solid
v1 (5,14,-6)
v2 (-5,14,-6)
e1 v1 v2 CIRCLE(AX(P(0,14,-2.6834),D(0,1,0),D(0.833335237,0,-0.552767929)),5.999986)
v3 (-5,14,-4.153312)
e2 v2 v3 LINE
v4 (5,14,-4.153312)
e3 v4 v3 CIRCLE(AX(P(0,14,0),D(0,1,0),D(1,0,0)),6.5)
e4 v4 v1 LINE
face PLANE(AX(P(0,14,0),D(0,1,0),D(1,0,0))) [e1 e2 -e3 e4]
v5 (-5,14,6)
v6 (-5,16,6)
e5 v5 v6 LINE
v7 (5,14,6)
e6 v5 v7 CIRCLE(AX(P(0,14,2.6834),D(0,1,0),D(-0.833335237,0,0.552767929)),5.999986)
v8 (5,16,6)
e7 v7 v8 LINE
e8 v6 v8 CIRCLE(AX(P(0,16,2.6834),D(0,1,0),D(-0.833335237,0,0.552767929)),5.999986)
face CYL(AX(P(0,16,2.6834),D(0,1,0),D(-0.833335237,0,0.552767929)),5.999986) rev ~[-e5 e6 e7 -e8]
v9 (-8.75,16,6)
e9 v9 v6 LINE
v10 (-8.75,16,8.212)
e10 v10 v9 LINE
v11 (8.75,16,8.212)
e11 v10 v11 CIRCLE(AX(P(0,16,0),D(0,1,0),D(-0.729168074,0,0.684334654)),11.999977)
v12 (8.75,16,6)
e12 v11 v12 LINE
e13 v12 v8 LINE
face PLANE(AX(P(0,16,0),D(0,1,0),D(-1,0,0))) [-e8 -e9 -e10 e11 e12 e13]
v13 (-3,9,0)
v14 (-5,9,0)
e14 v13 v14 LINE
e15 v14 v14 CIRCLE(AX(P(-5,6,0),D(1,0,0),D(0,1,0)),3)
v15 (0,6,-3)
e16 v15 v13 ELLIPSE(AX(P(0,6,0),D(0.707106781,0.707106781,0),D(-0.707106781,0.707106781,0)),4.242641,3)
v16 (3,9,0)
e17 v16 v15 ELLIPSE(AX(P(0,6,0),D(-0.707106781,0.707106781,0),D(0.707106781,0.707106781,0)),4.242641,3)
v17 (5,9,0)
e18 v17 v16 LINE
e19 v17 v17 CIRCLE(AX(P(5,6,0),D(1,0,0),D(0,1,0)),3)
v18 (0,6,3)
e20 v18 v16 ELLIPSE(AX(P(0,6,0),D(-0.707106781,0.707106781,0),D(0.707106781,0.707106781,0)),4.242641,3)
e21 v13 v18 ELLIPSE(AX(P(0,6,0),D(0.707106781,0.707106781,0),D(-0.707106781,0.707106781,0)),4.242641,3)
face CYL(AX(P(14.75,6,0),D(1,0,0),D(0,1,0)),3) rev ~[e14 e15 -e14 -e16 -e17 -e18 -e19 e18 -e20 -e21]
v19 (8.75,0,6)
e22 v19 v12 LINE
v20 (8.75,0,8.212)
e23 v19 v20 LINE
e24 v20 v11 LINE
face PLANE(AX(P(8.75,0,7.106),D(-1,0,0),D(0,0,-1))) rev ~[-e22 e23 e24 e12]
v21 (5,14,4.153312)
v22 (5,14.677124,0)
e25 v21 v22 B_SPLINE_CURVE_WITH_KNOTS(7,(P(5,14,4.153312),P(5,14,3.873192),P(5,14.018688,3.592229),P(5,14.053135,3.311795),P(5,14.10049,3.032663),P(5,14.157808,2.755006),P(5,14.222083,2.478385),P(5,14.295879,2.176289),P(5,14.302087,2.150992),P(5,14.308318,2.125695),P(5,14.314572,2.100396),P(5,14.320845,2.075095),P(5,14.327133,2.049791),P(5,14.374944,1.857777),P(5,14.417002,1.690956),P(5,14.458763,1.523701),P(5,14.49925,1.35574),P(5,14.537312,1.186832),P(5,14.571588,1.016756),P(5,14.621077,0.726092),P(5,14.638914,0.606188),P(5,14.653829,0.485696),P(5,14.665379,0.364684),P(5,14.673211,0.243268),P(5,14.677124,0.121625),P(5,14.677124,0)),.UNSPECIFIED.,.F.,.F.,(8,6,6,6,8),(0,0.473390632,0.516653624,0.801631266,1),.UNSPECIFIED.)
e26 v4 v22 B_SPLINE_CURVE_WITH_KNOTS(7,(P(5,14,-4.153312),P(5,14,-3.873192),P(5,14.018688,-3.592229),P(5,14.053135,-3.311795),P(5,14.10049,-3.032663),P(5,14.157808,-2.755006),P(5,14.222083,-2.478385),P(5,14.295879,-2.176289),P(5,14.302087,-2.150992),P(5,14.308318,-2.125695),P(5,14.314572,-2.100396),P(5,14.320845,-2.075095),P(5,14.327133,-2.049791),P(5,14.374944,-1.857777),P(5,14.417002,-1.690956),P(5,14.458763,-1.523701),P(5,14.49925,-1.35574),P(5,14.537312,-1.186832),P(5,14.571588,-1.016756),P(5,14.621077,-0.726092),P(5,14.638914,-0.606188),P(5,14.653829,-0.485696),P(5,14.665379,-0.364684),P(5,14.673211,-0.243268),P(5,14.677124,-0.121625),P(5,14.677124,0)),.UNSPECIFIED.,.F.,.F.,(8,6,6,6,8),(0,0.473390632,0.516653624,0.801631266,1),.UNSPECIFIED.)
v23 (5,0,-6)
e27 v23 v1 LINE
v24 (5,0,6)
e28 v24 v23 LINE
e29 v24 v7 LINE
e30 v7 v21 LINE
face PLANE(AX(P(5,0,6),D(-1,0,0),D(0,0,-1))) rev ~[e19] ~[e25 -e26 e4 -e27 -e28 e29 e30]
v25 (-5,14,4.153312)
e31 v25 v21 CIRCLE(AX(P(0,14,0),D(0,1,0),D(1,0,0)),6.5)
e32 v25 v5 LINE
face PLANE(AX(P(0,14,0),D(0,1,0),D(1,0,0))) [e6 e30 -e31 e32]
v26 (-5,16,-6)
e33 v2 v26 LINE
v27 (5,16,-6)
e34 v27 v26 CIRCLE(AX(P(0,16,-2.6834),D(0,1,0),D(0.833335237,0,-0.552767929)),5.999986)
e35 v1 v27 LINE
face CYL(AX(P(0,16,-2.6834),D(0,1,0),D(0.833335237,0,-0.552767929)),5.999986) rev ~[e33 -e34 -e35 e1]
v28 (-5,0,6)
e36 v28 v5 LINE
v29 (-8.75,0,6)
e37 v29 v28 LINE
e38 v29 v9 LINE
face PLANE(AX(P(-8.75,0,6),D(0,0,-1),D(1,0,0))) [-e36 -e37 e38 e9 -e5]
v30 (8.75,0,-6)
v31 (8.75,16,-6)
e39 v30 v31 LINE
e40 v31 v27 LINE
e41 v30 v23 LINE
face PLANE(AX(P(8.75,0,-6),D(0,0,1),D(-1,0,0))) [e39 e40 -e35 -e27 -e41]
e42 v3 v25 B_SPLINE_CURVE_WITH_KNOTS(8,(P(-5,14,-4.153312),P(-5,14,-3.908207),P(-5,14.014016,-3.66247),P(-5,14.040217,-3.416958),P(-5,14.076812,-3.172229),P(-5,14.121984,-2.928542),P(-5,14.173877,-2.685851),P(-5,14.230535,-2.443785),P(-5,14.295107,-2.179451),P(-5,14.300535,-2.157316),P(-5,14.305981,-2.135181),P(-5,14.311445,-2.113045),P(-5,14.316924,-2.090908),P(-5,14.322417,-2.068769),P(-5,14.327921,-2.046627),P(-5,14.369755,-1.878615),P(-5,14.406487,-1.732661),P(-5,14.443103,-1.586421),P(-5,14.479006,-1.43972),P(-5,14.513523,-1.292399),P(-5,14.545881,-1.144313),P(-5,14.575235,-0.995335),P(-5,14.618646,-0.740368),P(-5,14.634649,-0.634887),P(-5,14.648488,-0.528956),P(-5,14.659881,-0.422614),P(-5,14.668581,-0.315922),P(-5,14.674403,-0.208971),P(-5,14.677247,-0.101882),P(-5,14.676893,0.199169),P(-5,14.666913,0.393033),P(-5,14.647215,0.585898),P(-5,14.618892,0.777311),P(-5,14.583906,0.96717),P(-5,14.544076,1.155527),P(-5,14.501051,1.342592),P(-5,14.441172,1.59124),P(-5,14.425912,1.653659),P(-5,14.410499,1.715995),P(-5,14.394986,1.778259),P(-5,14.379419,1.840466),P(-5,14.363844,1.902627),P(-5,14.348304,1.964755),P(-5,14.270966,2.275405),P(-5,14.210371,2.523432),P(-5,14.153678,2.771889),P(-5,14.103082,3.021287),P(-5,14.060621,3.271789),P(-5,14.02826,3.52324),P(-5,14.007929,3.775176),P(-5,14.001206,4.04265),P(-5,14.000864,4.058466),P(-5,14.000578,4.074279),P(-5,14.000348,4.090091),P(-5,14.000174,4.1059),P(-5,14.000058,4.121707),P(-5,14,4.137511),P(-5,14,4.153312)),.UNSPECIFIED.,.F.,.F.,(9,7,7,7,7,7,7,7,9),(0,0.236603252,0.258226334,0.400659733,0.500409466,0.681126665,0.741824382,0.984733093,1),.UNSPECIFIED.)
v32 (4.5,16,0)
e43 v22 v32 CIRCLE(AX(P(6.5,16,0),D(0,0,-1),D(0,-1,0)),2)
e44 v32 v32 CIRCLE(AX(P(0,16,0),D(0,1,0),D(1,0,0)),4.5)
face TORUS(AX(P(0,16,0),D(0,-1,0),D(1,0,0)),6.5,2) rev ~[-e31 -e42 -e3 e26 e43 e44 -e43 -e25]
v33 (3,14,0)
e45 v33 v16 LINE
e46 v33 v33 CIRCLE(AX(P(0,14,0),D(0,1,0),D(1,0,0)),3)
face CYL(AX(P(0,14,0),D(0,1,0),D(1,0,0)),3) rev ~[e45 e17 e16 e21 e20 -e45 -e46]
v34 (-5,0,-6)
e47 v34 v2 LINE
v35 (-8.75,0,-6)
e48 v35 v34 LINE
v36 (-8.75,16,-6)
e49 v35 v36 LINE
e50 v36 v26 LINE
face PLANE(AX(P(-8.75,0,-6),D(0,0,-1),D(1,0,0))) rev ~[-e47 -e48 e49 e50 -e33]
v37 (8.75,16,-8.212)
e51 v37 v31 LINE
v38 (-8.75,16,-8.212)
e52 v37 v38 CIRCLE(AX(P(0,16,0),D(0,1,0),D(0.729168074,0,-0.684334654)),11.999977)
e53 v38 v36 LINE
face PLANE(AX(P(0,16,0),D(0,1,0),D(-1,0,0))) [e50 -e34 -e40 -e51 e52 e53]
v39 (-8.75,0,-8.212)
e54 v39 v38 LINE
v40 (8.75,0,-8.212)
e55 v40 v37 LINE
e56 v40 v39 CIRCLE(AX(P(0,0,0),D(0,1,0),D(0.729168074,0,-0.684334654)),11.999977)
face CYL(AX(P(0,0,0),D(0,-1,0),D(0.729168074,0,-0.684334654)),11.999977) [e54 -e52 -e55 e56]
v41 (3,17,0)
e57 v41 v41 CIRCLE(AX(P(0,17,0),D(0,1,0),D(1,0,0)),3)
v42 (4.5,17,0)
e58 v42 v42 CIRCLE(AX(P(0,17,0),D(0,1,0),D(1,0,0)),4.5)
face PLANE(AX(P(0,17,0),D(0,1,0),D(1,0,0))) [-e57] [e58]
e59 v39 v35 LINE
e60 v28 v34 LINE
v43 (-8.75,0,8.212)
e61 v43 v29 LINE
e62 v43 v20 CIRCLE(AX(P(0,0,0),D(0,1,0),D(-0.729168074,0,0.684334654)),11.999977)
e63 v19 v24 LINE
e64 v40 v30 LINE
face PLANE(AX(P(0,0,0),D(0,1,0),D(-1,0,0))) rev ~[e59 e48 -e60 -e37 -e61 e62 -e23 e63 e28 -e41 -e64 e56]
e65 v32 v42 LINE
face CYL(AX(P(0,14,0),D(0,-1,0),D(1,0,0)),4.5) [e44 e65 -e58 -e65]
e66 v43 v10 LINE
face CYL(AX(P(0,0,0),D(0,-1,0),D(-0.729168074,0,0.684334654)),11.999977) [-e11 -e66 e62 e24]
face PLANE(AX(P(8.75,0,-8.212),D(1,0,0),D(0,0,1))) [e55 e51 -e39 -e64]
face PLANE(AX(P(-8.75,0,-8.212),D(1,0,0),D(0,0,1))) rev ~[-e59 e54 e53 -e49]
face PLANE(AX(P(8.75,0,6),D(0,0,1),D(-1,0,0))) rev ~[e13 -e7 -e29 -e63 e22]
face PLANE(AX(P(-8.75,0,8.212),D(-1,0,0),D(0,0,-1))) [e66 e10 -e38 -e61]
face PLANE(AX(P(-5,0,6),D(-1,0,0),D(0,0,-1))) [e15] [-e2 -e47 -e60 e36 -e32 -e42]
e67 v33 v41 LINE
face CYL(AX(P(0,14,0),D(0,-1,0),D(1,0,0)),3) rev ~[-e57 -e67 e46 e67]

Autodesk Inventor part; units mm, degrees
ref_plane "XZ Plane" through (0, 0, 0) normal (0, 1, 0) x (-1, 0, 0)
ref_plane "XY Plane" through (0, 0, 0) normal (0, 0, 1) x (1, 0, 0)
sketch "Sketch1" plane through (0, 0, 0) normal (0, 1, 0) x (-1, 0, 0)
  circle A0 centre (0, 0) radius 12 construction
  line L0 (-5, -16.2951) -> (5, -16.2951) construction
  arc A1 (-8.75, -8.212) -> (8.75, -8.212) centre (0, 0) ccw construction
  arc A2 (-8.75, -8.212) -> (8.75, -8.212) centre (0, 0) ccw
  line L1 (14.6502, 6) -> (14.6502, -6) construction
  line L2 (8.75, -8.212) -> (8.75, -6)
  line L3 (8.75, -6) -> (5, -6)
  line L4 (-8.75, -8.212) -> (-8.75, -6)
  line L5 (-8.75, -6) -> (-5, -6)
  arc A3 (-5, -6) -> (5, -6) centre (0, -2.6834) ccw
  line L6 (14.6502, 0) -> (-10.8345, 0) construction
  line L7 (8.75, -8.212) -> (8.75, 12.1901) construction
  line L8 (-8.75, -8.212) -> (-8.75, 14.7434) construction
  arc A4 (8.75, 8.212) -> (-8.75, 8.212) centre (0, 0) ccw construction
  line L9 (8.75, 8.212) -> (8.75, 6) construction
  arc A5 (8.75, 8.212) -> (-8.75, 8.212) centre (0, 0) ccw
  line L10 (8.75, 8.212) -> (8.75, 6)
  line L11 (-8.75, 8.212) -> (-8.75, 7.106)
  line L12 (-8.75, 7.106) -> (-8.75, 6)
  line L13 (-8.75, 6) -> (-5, 6)
  line L14 (8.75, 6) -> (5, 6)
  arc A6 (5, 6) -> (-5, 6) centre (0, 2.6834) ccw
  line L15 (-5, 6) -> (-5, -6)
  line L16 (5, 6) -> (5, -6)
  circle A7 centre (0, 0) radius 4.75 construction
  circle A8 centre (0, 0) radius 3 construction
  point P0 (0, -16.2951)
  dimension "d0" = 24
  dimension "d1" = 10
  dimension "d2" = 12
  dimension "d3" = 6
  dimension "d4" = 6
  dimension "d5" = 9.5
  dimension "d6" = 6
extrude "Extrusion1" add sketch "Sketch1" along normal blind 16
sketch "Sketch2" plane through (0, 16, 0) normal (0, 1, 0) x (1, 0, 0)
  line L0 (-5, 6) -> (-5, -6) projected
  line L1 (-5, -6) -> (-5, 6)
  line L2 (5, -6) -> (5, 6) projected
  line L3 (5, -6) -> (5, 6)
  arc A0 (-5, -6) -> (5, -6) centre (0, -2.6834) ccw
  line L4 (5, 6) -> (8.75, 6) projected
  arc A1 (5, 6) -> (-5, 6) centre (0, 2.6834) ccw
  point P0 (0, 0)
  dimension "d9" = 6
  dimension "d10" = 6
extrude "Extrusion2" cut sketch "Sketch2" against normal blind 2
sketch "Sketch3" plane through (0, 14, 0) normal (0, 1, 0) x (1, 0, 0)
  circle A0 centre (0, 0) radius 4.5
  circle A1 centre (0, 0) radius 3
  dimension "d13" = 9
  dimension "d14" = 6
extrude "Extrusion3" add sketch "Sketch3" along normal blind 3
fillet "Fillet1" radius 2 1 edges at (-4.5, 14, 0)
ref_plane "Work Plane1" through (14.75, 0, 0) normal (1, 0, 0) x (0, 1, 0)
sketch "Sketch4" plane through (14.75, 0, 0) normal (1, 0, 0) x (0, 1, 0)
  circle A0 centre (6, 0) radius 3
  point P0 (0, 0)
  dimension "d19" = 6
  dimension "d20" = 6
extrude "Extrusion4" cut sketch "Sketch4" against normal blind 888
sketch "Sketch5" plane through (0, 14, 0) normal (0, 1, 0) x (1, 0, 0)
  circle A0 centre (0, 0) radius 3
  dimension "d23" = 6
extrude "Extrusion5" cut sketch "Sketch5" against normal up to surface
thread "Thread2" size "M6" standard "Din Taper" length 10
properties part number "Crosshead" material "Brass, Soft Yellow"
